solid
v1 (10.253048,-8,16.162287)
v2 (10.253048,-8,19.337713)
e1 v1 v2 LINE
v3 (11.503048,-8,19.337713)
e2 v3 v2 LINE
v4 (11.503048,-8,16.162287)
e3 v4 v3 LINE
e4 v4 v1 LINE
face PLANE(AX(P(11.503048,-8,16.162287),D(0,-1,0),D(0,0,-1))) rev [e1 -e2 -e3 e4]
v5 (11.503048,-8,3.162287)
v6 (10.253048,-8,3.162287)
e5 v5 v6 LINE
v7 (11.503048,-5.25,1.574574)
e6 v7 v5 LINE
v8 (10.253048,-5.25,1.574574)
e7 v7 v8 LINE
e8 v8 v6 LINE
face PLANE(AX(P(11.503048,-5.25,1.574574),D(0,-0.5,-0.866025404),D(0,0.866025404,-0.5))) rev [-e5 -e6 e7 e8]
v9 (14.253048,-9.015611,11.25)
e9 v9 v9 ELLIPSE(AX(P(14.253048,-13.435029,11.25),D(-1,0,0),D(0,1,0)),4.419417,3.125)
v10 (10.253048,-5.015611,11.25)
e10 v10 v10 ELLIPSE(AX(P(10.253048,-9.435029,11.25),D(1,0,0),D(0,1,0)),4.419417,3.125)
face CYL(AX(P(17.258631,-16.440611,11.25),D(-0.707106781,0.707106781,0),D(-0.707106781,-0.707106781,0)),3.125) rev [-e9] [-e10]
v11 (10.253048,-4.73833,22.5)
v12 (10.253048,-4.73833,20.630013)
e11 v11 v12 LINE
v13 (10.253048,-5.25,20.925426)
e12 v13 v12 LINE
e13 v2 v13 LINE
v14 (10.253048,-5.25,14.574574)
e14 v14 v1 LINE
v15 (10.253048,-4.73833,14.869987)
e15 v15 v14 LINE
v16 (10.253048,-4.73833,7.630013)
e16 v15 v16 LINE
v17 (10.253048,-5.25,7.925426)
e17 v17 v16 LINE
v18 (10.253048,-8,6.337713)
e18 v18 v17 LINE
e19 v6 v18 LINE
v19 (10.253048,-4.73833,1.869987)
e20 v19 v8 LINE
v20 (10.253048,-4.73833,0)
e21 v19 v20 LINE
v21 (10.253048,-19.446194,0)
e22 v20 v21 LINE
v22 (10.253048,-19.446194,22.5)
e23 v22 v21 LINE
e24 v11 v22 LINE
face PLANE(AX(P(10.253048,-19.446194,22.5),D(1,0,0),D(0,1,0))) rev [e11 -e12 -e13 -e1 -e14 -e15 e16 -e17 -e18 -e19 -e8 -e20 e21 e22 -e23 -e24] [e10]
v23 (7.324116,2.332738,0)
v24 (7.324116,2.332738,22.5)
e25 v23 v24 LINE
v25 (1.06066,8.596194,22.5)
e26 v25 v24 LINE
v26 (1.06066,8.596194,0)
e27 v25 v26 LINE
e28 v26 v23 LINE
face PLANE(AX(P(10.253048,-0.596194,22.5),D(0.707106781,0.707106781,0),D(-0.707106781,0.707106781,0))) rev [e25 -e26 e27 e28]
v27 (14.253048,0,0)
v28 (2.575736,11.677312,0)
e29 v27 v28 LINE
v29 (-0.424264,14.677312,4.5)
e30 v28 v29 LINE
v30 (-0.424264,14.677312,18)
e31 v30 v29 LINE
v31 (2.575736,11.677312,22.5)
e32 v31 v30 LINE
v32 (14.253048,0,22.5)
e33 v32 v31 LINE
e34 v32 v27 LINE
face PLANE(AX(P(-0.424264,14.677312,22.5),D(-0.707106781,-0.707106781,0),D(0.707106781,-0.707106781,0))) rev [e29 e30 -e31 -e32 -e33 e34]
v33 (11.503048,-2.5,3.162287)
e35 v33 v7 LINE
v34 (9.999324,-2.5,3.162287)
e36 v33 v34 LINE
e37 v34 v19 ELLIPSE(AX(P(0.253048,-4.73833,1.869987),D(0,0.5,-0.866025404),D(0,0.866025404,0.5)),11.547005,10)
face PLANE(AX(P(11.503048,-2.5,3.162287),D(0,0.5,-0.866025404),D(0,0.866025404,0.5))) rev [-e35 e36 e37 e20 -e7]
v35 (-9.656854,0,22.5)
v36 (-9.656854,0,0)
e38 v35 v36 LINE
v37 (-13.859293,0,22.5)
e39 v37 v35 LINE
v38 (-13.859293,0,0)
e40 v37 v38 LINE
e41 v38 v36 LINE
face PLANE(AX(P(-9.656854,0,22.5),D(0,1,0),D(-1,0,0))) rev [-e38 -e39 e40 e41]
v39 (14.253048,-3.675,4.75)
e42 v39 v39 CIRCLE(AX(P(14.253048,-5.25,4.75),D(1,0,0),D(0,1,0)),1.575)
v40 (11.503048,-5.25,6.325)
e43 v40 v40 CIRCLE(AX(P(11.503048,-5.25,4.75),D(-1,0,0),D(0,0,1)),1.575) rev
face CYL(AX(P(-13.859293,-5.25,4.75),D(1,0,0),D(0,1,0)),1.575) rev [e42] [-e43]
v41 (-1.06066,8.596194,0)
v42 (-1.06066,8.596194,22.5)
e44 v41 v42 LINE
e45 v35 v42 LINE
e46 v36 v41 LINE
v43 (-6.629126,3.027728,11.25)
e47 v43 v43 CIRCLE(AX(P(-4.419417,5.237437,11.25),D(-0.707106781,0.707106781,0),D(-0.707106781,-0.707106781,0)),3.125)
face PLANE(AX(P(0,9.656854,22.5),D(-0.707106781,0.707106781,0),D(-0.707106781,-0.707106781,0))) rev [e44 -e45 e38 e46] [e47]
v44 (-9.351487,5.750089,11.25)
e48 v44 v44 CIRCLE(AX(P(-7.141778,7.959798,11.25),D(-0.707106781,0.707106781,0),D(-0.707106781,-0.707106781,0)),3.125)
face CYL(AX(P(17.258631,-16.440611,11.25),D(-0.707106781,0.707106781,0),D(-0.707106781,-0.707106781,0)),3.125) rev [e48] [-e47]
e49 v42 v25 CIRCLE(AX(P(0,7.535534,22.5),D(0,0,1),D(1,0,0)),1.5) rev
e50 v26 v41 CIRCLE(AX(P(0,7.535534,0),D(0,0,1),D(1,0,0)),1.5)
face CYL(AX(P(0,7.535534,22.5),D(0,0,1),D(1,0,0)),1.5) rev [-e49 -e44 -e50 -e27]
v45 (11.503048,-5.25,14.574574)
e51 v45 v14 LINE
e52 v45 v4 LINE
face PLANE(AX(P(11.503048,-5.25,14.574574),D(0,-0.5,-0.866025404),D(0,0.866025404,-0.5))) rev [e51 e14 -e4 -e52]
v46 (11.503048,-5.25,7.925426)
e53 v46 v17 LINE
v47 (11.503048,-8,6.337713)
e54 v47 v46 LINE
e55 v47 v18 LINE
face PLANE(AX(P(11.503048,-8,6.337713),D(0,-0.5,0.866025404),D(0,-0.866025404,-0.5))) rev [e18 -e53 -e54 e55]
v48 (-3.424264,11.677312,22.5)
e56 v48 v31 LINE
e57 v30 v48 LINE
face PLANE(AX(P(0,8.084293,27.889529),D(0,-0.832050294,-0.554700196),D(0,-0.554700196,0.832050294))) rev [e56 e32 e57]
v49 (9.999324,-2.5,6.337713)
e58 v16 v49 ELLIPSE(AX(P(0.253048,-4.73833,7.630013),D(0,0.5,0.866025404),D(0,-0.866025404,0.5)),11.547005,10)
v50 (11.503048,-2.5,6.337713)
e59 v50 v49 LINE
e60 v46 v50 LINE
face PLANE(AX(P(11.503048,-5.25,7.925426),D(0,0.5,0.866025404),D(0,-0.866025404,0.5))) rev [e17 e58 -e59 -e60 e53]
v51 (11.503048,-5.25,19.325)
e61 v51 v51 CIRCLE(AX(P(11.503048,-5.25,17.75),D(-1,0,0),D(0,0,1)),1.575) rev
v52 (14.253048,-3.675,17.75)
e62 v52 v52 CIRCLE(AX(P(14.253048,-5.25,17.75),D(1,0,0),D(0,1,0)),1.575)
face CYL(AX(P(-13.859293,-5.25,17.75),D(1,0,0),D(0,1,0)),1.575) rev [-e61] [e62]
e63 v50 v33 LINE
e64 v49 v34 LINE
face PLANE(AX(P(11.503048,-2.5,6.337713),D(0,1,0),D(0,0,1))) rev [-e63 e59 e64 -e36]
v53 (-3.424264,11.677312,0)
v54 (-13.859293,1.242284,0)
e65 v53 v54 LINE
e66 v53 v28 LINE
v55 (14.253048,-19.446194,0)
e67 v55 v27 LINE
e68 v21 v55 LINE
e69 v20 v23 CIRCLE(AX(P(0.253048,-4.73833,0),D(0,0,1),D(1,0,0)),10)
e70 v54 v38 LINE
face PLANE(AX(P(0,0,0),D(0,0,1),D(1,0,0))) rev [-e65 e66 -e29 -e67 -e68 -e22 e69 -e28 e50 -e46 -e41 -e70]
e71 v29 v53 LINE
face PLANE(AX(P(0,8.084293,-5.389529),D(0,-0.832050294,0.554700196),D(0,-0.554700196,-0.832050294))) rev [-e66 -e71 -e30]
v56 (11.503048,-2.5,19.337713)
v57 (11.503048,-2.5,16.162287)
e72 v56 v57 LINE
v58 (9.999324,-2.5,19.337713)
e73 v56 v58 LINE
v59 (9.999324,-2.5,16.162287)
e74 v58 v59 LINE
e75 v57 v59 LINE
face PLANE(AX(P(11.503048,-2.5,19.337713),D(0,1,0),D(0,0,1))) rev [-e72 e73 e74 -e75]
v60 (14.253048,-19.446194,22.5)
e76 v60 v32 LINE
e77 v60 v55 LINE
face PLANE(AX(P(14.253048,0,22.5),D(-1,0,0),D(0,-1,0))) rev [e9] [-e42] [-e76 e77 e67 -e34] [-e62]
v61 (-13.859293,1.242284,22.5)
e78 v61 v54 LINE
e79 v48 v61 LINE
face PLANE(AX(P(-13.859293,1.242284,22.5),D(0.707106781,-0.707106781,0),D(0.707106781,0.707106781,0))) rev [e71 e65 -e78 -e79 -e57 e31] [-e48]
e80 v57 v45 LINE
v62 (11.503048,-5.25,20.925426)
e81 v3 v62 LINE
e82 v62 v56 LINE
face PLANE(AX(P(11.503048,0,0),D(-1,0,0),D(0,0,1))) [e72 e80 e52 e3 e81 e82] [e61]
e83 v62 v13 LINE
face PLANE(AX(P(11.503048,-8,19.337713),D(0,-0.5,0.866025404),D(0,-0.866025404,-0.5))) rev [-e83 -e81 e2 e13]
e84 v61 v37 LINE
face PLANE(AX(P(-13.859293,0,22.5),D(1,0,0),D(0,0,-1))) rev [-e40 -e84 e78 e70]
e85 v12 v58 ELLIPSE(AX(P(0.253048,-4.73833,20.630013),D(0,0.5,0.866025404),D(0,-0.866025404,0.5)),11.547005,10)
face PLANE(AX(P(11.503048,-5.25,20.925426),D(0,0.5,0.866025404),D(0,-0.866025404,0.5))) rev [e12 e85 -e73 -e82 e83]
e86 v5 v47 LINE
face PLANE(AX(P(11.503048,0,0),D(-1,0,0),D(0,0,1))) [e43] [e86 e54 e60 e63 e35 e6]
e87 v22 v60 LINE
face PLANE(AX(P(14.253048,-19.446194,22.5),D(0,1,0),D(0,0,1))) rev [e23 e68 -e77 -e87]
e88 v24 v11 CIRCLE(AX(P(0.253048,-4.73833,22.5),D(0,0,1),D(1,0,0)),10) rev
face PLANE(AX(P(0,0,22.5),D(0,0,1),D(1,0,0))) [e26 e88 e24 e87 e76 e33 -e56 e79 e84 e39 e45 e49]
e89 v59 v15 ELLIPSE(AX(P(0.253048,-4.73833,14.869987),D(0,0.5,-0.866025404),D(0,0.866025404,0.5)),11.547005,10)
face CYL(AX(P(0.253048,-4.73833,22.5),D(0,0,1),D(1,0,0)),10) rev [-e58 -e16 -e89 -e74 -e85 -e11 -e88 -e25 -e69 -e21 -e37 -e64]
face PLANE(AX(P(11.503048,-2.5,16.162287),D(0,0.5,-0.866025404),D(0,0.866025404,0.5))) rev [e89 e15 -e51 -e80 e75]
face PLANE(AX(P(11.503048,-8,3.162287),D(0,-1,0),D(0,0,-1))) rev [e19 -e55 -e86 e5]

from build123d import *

# Parameters (mm, degrees)
EXTRUDE_505_DEPTH      = 22.5
SKETCH_2_R             = 3.125
SMA_DEPTH              = 42.358123054
SKETCH_3_R             = 1.575
CUT_EXTRUDE_957_DEPTH  = 41.923198727
CUT_EXTRUDE_2_DEPTH    = 1.25
CUT_EXTRUDE_1673_DEPTH = 42.700155069
FILLET_1_R             = 10
FILLET_2_R             = 1.5


with BuildPart() as part:
    # Sketch 1 → Extrude 505 (new body)
    with BuildSketch(Plane.XY):
        Polygon((14.253048327, 0), (14.253048327, -19.446194078), (10.253048327, -19.446194078), (10.253048327, -0.596194078), (0, 9.656854249), (-9.656854249, 0), (-13.859292911, 0), (-13.859292911, 1.242283553), (-0.424264069, 14.677312396), align=None)
    extrude(amount=EXTRUDE_505_DEPTH)

    # Sketch 2 → SMA接口 (cut, through all)
    with BuildSketch(Plane(origin=(-7.550788232, 7.550788232, 0), x_dir=(0, 0, 1), z_dir=(-0.7071067811865486, 0.7071067811865465, 0))):
        with Locations(Location((11.25, 0.578427125, 0), (0, 0, 270))):
            Circle(SKETCH_2_R)
    extrude(amount=-SMA_DEPTH, mode=Mode.SUBTRACT)

    # 草图3 → Cut-Extrude 957 (cut, through all)
    with BuildSketch(Plane(origin=(14.253048327, 0, 0), x_dir=(0, 0, -1), z_dir=(1, 0, 0))):
        with Locations(Location((-17.75, -5.25, 0), (0, 0, 90))):
            Circle(SKETCH_3_R)
        with Locations(Location((-4.75, -5.25, 0), (0, 0, 90))):
            Circle(SKETCH_3_R)
    extrude(amount=-CUT_EXTRUDE_957_DEPTH, mode=Mode.SUBTRACT)

    # 草图4 → 侧板接口-2 (cut)
    with BuildSketch(Plane.ZY.offset(-10.253048327)):
        Polygon((6.33771324, -8), (7.925426481, -5.25), (6.33771324, -2.5), (3.16228676, -2.5), (1.574573519, -5.25), (3.16228676, -8), align=None)
        Polygon((19.33771324, -8), (20.925426481, -5.25), (19.33771324, -2.5), (16.16228676, -2.5), (14.574573519, -5.25), (16.16228676, -8), align=None)
    extrude(amount=-CUT_EXTRUDE_2_DEPTH, mode=Mode.SUBTRACT)

    # 草图7 → Cut-Extrude 1673 (cut, through all)
    with BuildSketch(Plane(origin=(0, 8.084293197, -5.389528798), x_dir=(-1, 0, 0), z_dir=(0, -0.8320502943378436, 0.5547001962252295))):
        Polygon((0.424264069, -11.885734391), (-2.575735931, -6.477407477), (3.424264069, -6.477407477), align=None)
    cut_extrude_1673 = extrude(amount=-CUT_EXTRUDE_1673_DEPTH, mode=Mode.SUBTRACT)

    # 镜向1: Cut-Extrude 1673 across plane
    add(cut_extrude_1673.mirror(Plane.XY.offset(11.25)), mode=Mode.SUBTRACT)

    # 圆角1
    # the kernel refuses this fillet: 10 mm, written as the material it adds along each edge
    with BuildSketch(Plane(origin=(10.253048327, -0.596194078, 0), x_dir=(-0.7071067811865485, 0.7071067811865465, 0), z_dir=(0, 0, 1))) as fillet_1_piece_1_section:
        with BuildLine():
            CenterArc((FILLET_1_R * 0.414213562373, FILLET_1_R), FILLET_1_R, 225, 45)
            Line((-FILLET_1_R * 0.292893218813, FILLET_1_R * 0.292893218813), (0, 0))
            Line((0, 0), (FILLET_1_R * 0.414213562373, 0))
        make_face()
    fillet_1_piece_1 = extrude(amount=22.5, mode=Mode.PRIVATE)
    fillet_1_piece_1 = split(fillet_1_piece_1, bisect_by=Plane(origin=(9.571569557, -2.5, 2.084142207), z_dir=(0, 1, 0)), keep=Keep.TOP, mode=Mode.PRIVATE)
    add(fillet_1_piece_1)
    with BuildSketch(Plane(origin=(10.253048327, -0.596194078, 0), x_dir=(-0.7071067811865485, 0.7071067811865465, 0), z_dir=(0, 0, 1))) as fillet_1_piece_2_section:
        with BuildLine():
            CenterArc((FILLET_1_R * 0.414213562373, FILLET_1_R), FILLET_1_R, 225, 45)
            Line((-FILLET_1_R * 0.292893218813, FILLET_1_R * 0.292893218813), (0, 0))
            Line((0, 0), (FILLET_1_R * 0.414213562373, 0))
        make_face()
    fillet_1_piece_2 = extrude(amount=32.855339059, mode=Mode.PRIVATE)
    fillet_1_piece_2 = split(fillet_1_piece_2, bisect_by=Plane(origin=(10.174215165, -3.639691918, 2.504285324), z_dir=(0, 0.49999999999999994, -0.8660254037844389)), keep=Keep.TOP, mode=Mode.PRIVATE)
    add(fillet_1_piece_2)
    with BuildSketch(Plane(origin=(10.253048327, -0.596194078, -10.355339059), x_dir=(-0.7071067811865485, 0.7071067811865465, 0), z_dir=(0, 0, 1))) as fillet_1_piece_3_section:
        with BuildLine():
            CenterArc((FILLET_1_R * 0.414213562373, FILLET_1_R), FILLET_1_R, 225, 45)
            Line((-FILLET_1_R * 0.292893218813, FILLET_1_R * 0.292893218813), (0, 0))
            Line((0, 0), (FILLET_1_R * 0.414213562373, 0))
        make_face()
    fillet_1_piece_3 = extrude(amount=43.210678119, mode=Mode.PRIVATE)
    fillet_1_piece_3 = split(fillet_1_piece_3, bisect_by=Plane(origin=(10.175314786, -5.028011676, 14.702738538), z_dir=(0, 0.4999999999999995, -0.8660254037844389)), keep=Keep.TOP, mode=Mode.PRIVATE)
    fillet_1_piece_3 = split(fillet_1_piece_3, bisect_by=Plane(origin=(10.175314786, -5.028011676, 7.797261462), z_dir=(0, 0.49999999999999994, 0.8660254037844387)), keep=Keep.TOP, mode=Mode.PRIVATE)
    add(fillet_1_piece_3)
    with BuildSketch(Plane(origin=(10.253048327, -0.596194078, -10.355339059), x_dir=(-0.7071067811865485, 0.7071067811865465, 0), z_dir=(0, 0, 1))) as fillet_1_piece_4_section:
        with BuildLine():
            CenterArc((FILLET_1_R * 0.414213562373, FILLET_1_R), FILLET_1_R, 225, 45)
            Line((-FILLET_1_R * 0.292893218813, FILLET_1_R * 0.292893218813), (0, 0))
            Line((0, 0), (FILLET_1_R * 0.414213562373, 0))
        make_face()
    fillet_1_piece_4 = extrude(amount=32.855339059, mode=Mode.PRIVATE)
    fillet_1_piece_4 = split(fillet_1_piece_4, bisect_by=Plane(origin=(10.174215165, -3.639691918, 19.995714676), z_dir=(0, 0.4999999999999997, 0.8660254037844388)), keep=Keep.TOP, mode=Mode.PRIVATE)
    add(fillet_1_piece_4)

    # 圆角2
    fillet_2_edges = [part.edges().sort_by_distance(p)[0] for p in [
        (0, 9.656854249, 11.25),
    ]]
    fillet(fillet_2_edges, radius=FILLET_2_R)


solid = part.part
